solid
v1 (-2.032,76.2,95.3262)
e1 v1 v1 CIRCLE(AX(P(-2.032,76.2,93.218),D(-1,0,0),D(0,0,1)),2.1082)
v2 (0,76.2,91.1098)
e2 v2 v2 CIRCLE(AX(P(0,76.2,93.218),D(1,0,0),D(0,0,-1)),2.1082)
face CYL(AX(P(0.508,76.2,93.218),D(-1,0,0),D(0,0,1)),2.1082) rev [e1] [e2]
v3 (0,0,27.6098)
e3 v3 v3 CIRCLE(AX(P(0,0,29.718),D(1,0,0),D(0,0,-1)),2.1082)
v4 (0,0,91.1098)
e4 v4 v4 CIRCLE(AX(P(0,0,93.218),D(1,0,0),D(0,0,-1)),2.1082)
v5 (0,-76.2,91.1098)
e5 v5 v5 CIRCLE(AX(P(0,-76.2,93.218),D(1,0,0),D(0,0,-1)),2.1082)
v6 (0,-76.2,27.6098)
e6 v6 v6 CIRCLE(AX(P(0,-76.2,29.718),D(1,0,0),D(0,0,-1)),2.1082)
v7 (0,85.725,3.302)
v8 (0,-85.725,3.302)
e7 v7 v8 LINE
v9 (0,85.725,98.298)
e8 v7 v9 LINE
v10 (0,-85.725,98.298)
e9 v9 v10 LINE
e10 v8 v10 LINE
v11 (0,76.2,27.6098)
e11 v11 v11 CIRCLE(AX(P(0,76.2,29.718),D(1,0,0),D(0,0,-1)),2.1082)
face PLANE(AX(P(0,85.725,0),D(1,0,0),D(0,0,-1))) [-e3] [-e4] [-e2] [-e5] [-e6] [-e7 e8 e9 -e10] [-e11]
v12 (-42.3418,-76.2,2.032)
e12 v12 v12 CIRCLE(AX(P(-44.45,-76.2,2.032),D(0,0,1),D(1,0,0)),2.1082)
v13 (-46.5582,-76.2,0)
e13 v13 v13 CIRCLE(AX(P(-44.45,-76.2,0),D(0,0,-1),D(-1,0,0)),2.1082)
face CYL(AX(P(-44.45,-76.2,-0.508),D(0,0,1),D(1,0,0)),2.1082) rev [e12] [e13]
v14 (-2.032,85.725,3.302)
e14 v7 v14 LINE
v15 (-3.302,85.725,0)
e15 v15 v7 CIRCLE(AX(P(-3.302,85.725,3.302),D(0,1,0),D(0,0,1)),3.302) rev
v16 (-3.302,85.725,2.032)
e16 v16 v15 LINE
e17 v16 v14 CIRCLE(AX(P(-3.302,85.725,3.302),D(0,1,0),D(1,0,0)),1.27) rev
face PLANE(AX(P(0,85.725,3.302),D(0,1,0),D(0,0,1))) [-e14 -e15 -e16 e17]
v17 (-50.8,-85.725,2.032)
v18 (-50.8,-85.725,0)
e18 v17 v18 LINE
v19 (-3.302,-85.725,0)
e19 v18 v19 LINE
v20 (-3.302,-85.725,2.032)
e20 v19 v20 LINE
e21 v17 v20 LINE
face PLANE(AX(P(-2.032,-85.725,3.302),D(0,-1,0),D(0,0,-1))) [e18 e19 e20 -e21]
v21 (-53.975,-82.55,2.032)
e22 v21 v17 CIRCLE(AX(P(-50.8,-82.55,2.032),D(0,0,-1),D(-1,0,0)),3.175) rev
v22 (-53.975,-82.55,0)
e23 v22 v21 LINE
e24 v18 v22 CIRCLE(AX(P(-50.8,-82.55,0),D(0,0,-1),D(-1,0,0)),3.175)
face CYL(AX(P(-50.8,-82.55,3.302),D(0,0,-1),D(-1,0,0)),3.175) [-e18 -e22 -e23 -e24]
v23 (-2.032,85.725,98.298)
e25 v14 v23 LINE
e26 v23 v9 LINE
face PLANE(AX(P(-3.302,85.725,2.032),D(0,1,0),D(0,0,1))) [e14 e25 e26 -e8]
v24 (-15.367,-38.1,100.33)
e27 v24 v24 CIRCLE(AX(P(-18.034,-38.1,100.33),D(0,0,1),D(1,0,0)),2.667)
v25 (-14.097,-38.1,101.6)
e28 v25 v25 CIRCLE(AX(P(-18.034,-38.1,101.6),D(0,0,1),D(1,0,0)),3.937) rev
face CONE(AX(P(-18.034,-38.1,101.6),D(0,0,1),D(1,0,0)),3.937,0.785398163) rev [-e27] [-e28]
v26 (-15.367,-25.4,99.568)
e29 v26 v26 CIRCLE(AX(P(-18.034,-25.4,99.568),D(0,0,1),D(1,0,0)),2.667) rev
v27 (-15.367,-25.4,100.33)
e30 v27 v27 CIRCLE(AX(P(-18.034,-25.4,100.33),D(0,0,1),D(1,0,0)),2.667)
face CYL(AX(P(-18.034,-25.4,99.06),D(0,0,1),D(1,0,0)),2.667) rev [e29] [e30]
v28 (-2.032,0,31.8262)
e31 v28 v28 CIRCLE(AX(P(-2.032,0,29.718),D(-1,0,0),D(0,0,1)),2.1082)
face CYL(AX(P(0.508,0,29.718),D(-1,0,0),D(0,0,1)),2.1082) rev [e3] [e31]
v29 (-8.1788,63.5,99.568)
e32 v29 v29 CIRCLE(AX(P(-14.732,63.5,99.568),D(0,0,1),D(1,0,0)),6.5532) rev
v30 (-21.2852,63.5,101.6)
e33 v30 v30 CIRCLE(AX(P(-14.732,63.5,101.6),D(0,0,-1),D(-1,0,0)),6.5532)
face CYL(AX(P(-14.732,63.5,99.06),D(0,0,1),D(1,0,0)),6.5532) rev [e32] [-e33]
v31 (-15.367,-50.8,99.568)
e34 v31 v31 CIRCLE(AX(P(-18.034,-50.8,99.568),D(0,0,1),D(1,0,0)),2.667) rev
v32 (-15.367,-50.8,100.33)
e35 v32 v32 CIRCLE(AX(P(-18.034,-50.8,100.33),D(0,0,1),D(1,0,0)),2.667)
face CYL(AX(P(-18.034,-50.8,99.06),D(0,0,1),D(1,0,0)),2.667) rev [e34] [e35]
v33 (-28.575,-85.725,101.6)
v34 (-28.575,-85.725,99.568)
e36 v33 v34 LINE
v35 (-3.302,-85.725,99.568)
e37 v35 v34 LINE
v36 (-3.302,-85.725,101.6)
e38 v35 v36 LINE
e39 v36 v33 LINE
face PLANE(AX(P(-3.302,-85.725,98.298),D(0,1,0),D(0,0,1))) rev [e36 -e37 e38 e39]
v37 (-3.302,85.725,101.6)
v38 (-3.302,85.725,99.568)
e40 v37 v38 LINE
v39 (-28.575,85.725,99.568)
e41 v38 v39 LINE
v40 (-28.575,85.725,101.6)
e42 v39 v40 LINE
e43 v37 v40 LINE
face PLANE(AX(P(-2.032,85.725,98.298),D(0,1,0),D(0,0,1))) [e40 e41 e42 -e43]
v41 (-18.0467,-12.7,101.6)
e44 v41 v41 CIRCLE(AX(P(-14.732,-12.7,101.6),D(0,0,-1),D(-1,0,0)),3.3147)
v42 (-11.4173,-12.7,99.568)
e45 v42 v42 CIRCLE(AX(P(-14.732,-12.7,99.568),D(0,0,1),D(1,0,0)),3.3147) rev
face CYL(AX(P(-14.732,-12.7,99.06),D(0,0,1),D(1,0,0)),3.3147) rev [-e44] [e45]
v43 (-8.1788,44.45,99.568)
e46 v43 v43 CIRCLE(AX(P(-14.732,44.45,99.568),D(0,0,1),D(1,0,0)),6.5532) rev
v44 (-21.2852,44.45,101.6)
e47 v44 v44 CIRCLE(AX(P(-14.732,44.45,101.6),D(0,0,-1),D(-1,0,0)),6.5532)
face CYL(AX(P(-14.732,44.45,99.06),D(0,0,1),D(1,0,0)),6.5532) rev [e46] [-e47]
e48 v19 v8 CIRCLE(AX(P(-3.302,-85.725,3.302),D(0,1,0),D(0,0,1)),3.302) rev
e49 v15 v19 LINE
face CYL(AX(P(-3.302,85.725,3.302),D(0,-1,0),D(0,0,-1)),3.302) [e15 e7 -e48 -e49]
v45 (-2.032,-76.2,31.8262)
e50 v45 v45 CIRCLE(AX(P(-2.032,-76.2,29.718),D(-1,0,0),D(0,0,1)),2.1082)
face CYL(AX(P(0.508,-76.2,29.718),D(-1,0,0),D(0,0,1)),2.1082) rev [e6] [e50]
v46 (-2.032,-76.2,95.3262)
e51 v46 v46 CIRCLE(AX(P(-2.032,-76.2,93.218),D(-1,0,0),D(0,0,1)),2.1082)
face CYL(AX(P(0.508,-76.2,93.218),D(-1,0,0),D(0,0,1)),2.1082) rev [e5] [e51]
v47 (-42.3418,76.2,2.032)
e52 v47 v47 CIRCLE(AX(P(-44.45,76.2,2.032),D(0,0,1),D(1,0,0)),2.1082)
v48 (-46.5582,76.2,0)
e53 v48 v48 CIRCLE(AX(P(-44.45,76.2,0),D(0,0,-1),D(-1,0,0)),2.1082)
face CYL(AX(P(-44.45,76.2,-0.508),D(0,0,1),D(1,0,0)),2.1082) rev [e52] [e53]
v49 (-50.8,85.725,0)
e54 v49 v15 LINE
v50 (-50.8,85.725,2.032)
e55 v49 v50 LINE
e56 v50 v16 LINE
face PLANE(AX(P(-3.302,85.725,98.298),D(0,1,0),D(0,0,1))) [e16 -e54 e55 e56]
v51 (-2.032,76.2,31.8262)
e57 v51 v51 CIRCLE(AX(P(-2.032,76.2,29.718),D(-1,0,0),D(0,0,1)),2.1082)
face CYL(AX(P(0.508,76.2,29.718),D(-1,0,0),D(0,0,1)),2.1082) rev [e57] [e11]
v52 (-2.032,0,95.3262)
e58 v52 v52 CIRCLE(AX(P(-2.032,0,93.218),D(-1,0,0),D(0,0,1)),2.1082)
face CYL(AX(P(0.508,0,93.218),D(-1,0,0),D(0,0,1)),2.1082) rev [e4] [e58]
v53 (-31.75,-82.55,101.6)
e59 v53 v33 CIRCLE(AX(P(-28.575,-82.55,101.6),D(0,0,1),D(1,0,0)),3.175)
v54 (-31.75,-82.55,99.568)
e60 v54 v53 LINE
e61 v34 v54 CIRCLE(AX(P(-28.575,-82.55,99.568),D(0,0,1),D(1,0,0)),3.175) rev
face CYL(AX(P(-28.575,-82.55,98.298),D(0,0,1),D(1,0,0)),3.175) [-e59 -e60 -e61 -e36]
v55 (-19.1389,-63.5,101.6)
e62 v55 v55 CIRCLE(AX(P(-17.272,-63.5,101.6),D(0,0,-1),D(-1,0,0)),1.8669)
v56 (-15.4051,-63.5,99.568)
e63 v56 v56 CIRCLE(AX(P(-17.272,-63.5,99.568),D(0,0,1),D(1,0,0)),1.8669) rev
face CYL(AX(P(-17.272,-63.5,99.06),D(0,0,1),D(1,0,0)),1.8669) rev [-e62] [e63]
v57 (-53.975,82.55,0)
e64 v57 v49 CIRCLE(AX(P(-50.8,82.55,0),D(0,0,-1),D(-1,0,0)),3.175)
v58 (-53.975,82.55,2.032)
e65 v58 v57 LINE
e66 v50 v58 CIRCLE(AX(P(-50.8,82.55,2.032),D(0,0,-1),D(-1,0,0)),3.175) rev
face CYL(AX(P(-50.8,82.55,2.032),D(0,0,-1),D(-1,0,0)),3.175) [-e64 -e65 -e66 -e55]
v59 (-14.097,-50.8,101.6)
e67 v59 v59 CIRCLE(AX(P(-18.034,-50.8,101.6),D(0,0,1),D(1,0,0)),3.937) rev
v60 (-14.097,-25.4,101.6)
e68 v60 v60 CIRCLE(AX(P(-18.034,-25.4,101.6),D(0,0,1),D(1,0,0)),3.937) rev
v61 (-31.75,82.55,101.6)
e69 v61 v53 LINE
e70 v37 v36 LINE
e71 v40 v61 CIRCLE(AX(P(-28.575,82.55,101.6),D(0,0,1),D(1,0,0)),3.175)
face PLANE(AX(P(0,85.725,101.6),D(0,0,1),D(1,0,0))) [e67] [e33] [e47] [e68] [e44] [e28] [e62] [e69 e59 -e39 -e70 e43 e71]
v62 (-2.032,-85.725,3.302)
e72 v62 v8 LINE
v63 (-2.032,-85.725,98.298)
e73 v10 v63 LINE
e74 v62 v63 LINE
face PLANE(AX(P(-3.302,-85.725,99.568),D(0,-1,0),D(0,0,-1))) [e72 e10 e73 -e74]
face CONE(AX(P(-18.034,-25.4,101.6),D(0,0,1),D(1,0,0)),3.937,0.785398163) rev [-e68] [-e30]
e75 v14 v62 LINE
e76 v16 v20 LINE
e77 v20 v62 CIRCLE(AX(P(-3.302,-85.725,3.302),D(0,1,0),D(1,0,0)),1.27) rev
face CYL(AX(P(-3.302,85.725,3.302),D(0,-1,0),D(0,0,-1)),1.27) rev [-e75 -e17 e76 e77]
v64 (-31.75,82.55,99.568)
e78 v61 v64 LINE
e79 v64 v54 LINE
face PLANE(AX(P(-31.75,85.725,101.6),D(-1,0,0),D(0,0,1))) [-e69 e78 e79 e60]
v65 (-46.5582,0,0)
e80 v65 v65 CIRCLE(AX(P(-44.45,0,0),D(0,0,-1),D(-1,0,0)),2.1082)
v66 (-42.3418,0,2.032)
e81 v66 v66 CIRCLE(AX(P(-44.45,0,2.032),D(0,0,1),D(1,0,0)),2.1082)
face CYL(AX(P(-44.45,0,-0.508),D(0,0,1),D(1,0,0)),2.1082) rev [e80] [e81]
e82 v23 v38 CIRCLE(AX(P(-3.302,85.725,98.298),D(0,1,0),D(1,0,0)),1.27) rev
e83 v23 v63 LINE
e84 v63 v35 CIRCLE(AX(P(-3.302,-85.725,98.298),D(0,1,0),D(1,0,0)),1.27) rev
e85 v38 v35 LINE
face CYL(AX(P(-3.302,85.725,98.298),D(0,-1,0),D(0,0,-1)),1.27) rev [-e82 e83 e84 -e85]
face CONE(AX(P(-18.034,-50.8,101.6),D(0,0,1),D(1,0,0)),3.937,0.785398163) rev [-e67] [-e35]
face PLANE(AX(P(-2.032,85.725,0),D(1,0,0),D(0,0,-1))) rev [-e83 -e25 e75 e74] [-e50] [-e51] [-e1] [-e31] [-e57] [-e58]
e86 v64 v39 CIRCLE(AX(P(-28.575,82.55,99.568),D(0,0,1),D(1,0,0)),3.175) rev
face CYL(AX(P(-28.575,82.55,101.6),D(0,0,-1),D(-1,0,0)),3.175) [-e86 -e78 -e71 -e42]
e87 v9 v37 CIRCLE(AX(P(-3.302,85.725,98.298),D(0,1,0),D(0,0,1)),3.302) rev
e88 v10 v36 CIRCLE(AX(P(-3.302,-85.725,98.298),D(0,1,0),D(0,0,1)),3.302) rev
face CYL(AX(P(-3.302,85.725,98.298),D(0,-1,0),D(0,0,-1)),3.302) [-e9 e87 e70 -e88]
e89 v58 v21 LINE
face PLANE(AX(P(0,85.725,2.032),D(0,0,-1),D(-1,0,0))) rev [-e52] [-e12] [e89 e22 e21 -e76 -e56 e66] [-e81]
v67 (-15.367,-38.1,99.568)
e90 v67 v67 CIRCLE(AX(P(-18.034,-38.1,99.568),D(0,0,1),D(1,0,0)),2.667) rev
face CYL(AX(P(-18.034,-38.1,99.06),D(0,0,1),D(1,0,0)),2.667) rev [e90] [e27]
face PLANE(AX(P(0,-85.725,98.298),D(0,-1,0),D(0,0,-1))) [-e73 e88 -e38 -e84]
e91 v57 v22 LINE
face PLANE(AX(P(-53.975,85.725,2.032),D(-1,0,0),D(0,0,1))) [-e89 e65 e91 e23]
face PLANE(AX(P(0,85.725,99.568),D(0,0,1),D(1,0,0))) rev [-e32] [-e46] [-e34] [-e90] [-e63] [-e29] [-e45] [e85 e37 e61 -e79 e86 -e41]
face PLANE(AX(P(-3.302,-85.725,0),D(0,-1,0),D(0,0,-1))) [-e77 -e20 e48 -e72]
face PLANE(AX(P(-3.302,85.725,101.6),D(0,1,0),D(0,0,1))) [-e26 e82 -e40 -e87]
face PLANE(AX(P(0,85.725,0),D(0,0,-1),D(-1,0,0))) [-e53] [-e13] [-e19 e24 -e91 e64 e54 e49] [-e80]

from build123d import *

# Parameters (mm, degrees)
BASE_FLANGE1_DEPTH                 = 85.725
SKETCH2_R                          = 6.5532
SKETCH2_R_2                        = 3.3147
SKETCH2_R_3                        = 2.667
SKETCH2_R_4                        = 1.8669
FCE_1_INDICATOR_HOLES_DEPTH        = 2.54
SKETCH3_R                          = 2.1082
FCE_2_BRACKET_MOUNTING_HOLES_DEPTH = 2.54
CHAMFER1_SIZE                      = 1.27
SKETCH8_R                          = 2.1082
FCE_3_BOARD_MOUNTING_HOLES_DEPTH   = 2.54
FILLET1_R                          = 3.175


# Sheet-metal steps are written as plain solids
with BuildPart() as part:
    # Sketch1 → Base-Flange1 (new, symmetric)
    with BuildSketch(Plane(origin=(0, 0, 0), x_dir=(1, 0, 0), z_dir=(0, 1, 0))):
        with BuildLine():
            Line((-31.75, -101.6), (-3.302, -101.6))
            ThreePointArc((-3.302, -101.6), (-0.967133409, -100.632866591), (0, -98.298))
            Line((0, -98.298), (0, -3.302))
            ThreePointArc((0, -3.302), (-0.967133409, -0.967133409), (-3.302, 0))
            Line((-3.302, 0), (-53.975, 0))
            Line((-53.975, 0), (-53.975, -2.032))
            Line((-53.975, -2.032), (-3.302, -2.032))
            ThreePointArc((-3.302, -2.032), (-2.403974388, -2.403974388), (-2.032, -3.302))
            Line((-2.032, -3.302), (-2.032, -98.298))
            ThreePointArc((-2.032, -98.298), (-2.403974388, -99.196025612), (-3.302, -99.568))
            Line((-3.302, -99.568), (-31.75, -99.568))
            Line((-31.75, -99.568), (-31.75, -101.6))
        make_face()
    extrude(amount=BASE_FLANGE1_DEPTH, both=True)

    # Sketch2 → FCE-1 Indicator holes (cut)
    with BuildSketch(Plane(origin=(0, 0, 101.6), x_dir=(-1, 0, 0), z_dir=(0, 0, -1))):
        with Locations(Location((14.732, 63.5, 0), (0, 0, 180))):
            Circle(SKETCH2_R)
        with Locations(Location((14.732, 44.45, 0), (0, 0, 180))):
            Circle(SKETCH2_R)
        with Locations(Location((14.732, -12.7, 0), (0, 0, 180))):
            Circle(SKETCH2_R_2)
        with Locations(Location((18.034, -25.4, 0), (0, 0, 180))):
            Circle(SKETCH2_R_3)
        with Locations(Location((18.034, -38.1, 0), (0, 0, 180))):
            Circle(SKETCH2_R_3)
        with Locations(Location((18.034, -50.8, 0), (0, 0, 180))):
            Circle(SKETCH2_R_3)
        with Locations(Location((17.272, -63.5, 0), (0, 0, 180))):
            Circle(SKETCH2_R_4)
    extrude(amount=FCE_1_INDICATOR_HOLES_DEPTH, mode=Mode.SUBTRACT)

    # Sketch3 → FCE-2 Bracket Mounting Holes (cut)
    with BuildSketch(Plane.XY.offset(2.032)):
        with Locations((-44.45, 76.2)):
            Circle(SKETCH3_R)
        with Locations((-44.45, 0)):
            Circle(SKETCH3_R)
        with Locations((-44.45, -76.2)):
            Circle(SKETCH3_R)
    extrude(amount=-FCE_2_BRACKET_MOUNTING_HOLES_DEPTH, mode=Mode.SUBTRACT)

    # Chamfer1
    chamfer1_edges = [part.edges().sort_by_distance(p)[0] for p in [
        (-20.701, -25.4, 101.6),
        (-20.701, -38.1, 101.6),
        (-20.701, -50.8, 101.6),
    ]]
    chamfer(chamfer1_edges, length=CHAMFER1_SIZE)

    # Sketch8 → FCE-3 Board Mounting Holes (cut)
    with BuildSketch(Plane.ZY.offset(2.032)):
        with Locations((93.218, 76.2)):
            Circle(SKETCH8_R)
        with Locations((93.218, 0)):
            Circle(SKETCH8_R)
        with Locations((93.218, -76.2)):
            Circle(SKETCH8_R)
        with Locations((29.718, -76.2)):
            Circle(SKETCH8_R)
        with Locations((29.718, 0)):
            Circle(SKETCH8_R)
        with Locations((29.718, 76.2)):
            Circle(SKETCH8_R)
    extrude(amount=-FCE_3_BOARD_MOUNTING_HOLES_DEPTH, mode=Mode.SUBTRACT)

    # Fillet1
    fillet1_edges = [part.edges().sort_by_distance(p)[0] for p in [
        (-31.75, -85.725, 100.584),
        (-53.975, 85.725, 1.016),
        (-31.75, 85.725, 100.584),
        (-53.975, -85.725, 1.016),
    ]]
    fillet(fillet1_edges, radius=FILLET1_R)


solid = part.part
